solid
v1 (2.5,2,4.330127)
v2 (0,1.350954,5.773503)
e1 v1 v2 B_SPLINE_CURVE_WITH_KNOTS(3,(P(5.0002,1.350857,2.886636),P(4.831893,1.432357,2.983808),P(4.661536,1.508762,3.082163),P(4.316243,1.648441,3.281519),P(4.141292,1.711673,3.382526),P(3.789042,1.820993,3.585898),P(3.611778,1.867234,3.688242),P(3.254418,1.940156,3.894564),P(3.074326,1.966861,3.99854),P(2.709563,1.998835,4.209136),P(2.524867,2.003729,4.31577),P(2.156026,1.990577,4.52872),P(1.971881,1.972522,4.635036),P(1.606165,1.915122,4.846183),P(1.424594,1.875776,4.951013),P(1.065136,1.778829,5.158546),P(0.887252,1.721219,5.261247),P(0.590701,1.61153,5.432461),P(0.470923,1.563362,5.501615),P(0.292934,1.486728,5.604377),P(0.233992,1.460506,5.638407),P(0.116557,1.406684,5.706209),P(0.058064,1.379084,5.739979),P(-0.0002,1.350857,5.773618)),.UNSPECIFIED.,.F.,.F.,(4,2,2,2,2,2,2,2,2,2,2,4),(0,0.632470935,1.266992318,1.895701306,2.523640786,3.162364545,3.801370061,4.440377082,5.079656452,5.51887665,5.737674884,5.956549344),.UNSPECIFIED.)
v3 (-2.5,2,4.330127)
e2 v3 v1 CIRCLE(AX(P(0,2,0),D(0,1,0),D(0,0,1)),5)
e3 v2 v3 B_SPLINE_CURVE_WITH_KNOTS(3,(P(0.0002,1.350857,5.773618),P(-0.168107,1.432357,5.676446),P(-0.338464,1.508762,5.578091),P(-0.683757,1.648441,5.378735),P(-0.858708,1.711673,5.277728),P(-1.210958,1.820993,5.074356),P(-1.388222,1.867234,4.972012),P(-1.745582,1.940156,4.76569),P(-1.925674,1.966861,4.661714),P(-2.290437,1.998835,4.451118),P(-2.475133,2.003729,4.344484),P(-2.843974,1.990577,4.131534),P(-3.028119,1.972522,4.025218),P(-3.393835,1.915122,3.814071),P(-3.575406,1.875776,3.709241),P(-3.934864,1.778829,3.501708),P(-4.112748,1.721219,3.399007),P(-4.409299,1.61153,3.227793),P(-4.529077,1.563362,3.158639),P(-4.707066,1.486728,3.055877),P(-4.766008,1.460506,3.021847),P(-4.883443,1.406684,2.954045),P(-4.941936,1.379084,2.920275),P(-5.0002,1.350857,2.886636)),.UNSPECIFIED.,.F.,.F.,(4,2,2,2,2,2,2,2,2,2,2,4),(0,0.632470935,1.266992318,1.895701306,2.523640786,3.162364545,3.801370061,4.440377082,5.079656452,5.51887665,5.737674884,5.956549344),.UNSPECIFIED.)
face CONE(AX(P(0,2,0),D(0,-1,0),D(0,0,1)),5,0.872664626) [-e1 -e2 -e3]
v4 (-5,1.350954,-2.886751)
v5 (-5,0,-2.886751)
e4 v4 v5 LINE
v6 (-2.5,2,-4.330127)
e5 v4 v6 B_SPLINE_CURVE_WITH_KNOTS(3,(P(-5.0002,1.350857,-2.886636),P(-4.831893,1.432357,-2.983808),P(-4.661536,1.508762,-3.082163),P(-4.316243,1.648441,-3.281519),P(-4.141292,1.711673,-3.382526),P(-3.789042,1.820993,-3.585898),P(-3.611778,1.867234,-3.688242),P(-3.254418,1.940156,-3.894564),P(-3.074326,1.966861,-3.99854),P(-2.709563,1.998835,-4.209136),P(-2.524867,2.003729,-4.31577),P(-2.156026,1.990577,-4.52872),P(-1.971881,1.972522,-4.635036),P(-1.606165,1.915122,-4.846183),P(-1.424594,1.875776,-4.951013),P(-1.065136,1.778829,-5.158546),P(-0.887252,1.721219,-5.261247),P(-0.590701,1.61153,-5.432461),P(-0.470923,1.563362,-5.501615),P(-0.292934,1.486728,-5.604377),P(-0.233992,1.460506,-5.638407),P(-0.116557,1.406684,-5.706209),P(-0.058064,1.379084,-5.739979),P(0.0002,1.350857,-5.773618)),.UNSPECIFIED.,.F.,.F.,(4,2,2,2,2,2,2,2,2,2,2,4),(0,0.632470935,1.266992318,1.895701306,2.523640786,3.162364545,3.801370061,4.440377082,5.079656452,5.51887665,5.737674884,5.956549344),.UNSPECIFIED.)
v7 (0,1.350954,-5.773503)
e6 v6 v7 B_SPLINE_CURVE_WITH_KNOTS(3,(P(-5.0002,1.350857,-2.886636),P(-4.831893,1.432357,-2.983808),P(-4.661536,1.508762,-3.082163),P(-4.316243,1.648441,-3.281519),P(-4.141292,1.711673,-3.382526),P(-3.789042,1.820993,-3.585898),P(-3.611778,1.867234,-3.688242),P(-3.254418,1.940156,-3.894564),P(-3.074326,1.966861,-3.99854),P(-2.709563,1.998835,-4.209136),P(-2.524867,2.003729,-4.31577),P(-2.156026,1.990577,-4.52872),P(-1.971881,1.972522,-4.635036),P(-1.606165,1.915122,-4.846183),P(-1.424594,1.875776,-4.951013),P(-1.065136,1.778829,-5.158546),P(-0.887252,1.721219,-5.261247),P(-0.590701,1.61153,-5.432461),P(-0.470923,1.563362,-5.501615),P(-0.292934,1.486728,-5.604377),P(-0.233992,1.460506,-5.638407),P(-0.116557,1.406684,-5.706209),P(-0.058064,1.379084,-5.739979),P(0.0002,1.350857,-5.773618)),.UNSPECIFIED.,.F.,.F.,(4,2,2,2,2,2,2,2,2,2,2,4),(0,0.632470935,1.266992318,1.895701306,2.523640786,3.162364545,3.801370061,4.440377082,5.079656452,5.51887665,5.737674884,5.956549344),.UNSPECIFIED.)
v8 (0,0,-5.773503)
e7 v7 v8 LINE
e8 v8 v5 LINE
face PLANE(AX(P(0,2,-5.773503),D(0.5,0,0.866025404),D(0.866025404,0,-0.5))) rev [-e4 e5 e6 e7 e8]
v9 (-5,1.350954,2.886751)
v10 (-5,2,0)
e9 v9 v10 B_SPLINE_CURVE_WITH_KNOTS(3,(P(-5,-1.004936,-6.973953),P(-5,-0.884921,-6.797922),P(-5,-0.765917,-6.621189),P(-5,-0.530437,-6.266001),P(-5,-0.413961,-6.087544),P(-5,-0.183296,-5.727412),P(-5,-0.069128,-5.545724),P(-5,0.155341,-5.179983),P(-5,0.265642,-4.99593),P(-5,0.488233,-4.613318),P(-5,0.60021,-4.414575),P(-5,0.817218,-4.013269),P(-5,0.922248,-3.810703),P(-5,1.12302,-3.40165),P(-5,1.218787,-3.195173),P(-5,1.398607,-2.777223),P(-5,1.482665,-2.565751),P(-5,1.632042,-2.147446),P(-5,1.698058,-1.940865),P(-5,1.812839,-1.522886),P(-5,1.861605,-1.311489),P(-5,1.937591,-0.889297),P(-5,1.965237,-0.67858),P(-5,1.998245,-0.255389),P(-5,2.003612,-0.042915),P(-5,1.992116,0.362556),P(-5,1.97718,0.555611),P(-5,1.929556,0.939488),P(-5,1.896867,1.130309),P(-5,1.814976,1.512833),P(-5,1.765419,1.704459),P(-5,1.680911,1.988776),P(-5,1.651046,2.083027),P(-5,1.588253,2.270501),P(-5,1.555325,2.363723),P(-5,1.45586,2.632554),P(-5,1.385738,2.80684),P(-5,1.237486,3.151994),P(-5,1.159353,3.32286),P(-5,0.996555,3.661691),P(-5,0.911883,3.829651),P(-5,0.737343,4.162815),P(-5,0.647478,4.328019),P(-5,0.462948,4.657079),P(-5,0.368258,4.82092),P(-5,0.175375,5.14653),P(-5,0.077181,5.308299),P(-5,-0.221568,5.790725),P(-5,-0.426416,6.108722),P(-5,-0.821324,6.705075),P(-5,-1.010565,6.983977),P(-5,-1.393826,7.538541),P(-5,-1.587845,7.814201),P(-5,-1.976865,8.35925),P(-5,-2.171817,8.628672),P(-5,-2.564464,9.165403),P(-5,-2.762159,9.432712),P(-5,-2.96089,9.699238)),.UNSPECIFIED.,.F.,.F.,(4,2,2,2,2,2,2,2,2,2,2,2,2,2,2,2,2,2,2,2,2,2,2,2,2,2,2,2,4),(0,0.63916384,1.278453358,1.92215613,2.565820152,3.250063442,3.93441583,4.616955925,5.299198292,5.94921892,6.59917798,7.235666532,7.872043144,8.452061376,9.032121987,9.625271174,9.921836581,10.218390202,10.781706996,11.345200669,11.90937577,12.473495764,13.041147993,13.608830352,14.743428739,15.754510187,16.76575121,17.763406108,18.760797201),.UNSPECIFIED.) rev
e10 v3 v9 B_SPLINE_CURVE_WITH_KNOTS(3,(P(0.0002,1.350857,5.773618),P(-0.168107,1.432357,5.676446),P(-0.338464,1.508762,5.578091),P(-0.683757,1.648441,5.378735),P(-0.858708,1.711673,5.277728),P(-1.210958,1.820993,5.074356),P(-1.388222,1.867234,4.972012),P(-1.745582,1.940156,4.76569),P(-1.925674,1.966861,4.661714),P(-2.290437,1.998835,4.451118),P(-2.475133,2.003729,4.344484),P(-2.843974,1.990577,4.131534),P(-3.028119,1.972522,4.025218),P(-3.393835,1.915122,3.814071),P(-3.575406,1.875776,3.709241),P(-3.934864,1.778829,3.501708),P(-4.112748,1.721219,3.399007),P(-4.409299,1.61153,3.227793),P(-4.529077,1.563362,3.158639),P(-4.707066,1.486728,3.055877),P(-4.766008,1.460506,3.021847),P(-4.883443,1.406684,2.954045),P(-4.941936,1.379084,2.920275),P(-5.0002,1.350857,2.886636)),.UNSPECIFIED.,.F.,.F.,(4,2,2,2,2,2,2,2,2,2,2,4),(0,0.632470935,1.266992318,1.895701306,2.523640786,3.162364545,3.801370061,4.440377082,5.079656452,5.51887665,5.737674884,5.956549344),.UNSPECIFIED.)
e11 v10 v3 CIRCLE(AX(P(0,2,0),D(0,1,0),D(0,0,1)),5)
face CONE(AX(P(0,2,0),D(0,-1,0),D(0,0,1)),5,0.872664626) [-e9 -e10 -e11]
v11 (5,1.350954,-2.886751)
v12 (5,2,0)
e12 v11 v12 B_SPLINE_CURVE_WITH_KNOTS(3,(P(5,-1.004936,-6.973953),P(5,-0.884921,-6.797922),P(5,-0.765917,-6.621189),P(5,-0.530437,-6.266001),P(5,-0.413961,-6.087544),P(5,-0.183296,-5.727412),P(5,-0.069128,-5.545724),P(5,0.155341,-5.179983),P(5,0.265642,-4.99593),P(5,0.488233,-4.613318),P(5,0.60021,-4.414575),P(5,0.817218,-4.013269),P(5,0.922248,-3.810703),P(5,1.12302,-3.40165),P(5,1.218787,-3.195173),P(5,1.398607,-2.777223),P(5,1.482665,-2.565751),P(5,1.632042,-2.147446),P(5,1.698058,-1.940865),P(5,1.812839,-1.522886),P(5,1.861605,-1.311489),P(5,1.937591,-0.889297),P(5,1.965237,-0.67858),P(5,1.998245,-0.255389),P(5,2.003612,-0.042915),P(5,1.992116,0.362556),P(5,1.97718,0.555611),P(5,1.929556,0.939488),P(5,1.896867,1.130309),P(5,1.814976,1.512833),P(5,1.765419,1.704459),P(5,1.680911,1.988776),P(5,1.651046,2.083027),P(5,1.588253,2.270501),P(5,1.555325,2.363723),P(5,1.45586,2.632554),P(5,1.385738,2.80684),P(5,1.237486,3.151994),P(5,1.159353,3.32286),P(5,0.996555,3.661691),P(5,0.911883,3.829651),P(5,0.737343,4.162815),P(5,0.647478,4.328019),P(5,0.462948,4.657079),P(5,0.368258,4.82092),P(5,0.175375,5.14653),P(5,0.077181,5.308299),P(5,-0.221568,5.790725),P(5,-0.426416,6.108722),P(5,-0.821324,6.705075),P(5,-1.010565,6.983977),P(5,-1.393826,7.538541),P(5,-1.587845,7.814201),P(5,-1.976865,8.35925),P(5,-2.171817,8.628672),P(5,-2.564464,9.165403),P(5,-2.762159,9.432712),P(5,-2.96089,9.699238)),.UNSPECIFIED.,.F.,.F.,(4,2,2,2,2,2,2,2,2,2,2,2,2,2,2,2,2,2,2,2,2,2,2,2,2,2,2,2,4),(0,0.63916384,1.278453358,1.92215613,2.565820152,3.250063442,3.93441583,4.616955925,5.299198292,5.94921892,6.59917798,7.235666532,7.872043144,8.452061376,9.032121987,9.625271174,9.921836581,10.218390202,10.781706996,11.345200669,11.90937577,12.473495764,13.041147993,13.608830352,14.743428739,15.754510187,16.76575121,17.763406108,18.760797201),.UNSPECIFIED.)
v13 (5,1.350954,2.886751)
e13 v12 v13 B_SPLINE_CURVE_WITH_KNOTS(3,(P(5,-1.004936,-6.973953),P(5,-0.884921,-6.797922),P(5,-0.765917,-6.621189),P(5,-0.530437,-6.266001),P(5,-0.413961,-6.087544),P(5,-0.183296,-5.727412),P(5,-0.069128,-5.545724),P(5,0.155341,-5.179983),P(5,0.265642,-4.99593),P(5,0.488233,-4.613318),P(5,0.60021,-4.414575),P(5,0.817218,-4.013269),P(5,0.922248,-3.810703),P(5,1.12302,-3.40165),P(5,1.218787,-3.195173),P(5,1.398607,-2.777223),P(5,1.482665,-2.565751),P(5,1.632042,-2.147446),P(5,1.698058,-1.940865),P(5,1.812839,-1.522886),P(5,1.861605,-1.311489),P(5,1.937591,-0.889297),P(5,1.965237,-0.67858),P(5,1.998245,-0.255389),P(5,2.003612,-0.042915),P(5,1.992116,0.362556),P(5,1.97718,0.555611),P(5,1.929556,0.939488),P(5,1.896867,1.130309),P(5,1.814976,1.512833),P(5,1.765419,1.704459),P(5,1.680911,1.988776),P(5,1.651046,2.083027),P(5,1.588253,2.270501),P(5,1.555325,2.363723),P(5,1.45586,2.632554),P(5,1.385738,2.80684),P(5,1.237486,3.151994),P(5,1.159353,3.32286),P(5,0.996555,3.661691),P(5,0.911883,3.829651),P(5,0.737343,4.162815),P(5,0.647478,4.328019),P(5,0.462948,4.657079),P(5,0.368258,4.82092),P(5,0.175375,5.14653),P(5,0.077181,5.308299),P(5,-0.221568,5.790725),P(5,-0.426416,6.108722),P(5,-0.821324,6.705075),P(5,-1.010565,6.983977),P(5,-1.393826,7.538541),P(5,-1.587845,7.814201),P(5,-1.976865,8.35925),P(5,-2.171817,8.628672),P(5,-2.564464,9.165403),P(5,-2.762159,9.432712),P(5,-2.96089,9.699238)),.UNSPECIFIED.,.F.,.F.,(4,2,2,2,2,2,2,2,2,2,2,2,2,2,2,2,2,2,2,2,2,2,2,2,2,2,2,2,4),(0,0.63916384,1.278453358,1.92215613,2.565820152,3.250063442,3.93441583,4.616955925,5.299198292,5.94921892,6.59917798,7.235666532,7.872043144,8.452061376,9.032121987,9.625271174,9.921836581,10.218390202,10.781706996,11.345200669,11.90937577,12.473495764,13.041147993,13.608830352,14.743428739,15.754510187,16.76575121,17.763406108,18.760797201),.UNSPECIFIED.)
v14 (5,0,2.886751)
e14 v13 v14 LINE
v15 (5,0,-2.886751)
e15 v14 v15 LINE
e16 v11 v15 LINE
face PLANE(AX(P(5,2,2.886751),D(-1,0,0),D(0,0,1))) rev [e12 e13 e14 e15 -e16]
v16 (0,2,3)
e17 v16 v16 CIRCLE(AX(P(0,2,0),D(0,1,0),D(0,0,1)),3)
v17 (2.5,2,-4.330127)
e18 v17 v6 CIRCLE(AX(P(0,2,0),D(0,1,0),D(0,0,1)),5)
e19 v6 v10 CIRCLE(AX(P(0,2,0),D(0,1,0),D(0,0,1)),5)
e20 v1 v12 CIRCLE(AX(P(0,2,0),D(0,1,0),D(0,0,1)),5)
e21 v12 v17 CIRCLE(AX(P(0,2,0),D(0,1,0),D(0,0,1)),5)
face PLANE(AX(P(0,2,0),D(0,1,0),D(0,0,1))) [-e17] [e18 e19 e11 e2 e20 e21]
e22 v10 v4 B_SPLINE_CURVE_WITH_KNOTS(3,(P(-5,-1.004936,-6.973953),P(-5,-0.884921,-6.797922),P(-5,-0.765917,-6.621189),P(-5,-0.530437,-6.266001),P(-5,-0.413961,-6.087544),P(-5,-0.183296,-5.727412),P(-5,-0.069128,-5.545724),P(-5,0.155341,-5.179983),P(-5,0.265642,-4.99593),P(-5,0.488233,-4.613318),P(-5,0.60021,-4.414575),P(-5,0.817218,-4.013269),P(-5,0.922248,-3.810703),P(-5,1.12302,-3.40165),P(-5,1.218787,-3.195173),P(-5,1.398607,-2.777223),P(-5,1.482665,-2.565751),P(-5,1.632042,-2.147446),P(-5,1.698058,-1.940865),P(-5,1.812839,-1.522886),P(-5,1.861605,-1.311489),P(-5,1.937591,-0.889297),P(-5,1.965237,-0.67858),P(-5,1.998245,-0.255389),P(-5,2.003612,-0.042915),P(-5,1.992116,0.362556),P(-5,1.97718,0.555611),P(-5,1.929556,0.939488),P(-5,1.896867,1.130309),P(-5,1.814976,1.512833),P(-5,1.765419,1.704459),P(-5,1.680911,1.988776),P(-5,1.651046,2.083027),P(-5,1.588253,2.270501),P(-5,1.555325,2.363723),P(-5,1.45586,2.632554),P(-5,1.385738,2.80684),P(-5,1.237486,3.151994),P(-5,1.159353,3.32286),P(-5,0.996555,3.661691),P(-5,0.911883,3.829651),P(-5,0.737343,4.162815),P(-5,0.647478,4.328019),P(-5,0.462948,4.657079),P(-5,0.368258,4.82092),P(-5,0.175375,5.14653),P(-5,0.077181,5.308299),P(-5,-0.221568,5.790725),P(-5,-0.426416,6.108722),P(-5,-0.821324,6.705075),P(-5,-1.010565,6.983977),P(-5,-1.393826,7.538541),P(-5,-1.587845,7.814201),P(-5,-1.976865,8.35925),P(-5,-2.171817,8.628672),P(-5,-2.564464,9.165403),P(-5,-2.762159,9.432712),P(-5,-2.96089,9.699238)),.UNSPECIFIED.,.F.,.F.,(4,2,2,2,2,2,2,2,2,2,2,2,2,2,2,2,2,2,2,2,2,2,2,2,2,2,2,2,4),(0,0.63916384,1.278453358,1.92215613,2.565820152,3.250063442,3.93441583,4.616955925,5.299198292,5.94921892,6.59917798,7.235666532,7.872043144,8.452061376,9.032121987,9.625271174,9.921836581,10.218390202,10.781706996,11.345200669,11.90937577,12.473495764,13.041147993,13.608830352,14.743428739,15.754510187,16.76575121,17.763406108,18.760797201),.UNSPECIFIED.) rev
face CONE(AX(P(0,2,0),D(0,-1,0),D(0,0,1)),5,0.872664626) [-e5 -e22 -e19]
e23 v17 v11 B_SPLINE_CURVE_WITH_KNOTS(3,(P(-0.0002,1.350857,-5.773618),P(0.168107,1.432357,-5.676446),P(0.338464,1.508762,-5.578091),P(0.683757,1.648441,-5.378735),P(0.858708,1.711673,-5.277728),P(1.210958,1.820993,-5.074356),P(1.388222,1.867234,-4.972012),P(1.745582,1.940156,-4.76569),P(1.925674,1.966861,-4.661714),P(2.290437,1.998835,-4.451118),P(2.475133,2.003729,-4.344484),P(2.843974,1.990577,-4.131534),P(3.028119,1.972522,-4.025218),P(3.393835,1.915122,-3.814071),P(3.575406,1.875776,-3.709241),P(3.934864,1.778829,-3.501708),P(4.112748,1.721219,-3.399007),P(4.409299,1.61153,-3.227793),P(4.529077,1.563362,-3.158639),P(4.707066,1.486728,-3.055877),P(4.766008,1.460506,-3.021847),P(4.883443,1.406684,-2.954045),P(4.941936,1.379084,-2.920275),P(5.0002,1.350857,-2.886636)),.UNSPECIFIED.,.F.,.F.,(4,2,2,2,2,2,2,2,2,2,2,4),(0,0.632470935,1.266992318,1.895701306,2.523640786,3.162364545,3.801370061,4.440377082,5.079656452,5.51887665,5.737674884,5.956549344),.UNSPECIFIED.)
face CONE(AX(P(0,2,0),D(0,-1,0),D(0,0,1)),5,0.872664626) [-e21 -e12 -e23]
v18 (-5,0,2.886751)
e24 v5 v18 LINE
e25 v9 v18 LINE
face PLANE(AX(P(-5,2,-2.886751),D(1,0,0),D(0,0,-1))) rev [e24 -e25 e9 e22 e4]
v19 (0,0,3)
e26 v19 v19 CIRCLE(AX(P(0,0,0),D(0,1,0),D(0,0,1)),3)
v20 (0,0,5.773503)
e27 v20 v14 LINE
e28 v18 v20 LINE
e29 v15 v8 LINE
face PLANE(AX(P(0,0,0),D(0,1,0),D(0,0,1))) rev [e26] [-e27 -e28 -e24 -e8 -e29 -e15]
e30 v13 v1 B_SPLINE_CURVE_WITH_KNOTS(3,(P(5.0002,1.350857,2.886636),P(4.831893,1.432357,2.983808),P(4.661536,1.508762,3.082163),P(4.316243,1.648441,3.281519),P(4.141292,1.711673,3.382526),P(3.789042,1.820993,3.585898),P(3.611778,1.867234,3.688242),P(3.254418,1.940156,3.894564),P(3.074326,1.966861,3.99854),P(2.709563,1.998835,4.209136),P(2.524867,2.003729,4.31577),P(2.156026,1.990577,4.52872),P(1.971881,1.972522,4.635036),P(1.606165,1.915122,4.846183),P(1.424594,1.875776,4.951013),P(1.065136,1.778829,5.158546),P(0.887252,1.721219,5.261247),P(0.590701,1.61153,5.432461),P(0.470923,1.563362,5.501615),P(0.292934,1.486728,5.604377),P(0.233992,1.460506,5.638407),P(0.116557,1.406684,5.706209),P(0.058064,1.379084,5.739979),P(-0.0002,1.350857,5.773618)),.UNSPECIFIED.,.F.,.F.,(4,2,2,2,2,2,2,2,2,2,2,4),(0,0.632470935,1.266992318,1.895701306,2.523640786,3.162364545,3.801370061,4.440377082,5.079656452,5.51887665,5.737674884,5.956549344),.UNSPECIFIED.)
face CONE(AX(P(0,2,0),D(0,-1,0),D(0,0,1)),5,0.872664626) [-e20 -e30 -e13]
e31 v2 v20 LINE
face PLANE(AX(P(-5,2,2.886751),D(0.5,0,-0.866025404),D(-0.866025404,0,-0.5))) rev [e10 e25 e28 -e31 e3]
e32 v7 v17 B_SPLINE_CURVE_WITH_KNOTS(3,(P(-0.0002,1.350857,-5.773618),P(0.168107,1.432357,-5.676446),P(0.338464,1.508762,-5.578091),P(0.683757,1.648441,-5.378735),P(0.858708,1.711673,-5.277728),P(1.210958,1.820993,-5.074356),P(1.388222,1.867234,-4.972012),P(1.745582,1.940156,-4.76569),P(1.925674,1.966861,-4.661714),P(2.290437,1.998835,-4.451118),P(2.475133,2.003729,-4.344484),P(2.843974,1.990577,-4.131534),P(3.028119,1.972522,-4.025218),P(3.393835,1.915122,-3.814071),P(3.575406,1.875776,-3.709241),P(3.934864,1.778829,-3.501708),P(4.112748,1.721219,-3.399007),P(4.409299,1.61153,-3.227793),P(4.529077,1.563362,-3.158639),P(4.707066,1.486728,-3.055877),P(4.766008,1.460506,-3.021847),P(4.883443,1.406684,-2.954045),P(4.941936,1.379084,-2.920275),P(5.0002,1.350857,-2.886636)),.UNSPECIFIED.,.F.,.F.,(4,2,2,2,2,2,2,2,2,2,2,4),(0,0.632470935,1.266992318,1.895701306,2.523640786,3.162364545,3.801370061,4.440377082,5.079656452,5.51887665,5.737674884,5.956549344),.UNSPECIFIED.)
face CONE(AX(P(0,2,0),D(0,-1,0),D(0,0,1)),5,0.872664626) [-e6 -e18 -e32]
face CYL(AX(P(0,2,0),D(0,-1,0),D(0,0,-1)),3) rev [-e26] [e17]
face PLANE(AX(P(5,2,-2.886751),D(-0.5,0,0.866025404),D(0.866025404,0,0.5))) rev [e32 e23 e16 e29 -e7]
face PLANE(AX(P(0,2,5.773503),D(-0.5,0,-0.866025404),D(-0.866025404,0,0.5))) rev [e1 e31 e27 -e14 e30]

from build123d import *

# Parameters (mm, degrees)
SKETCH1_R           = 3
BOSS_EXTRUDE1_DEPTH = 2


# Read off the part's stored shape, not the designer's step: Cut-Extrude2
with BuildPart() as part:
    # Sketch1 → Boss-Extrude1 (new body)
    with BuildSketch(Plane(origin=(0, 0, 0), x_dir=(1, 0, 0), z_dir=(0, 1, 0))):
        Polygon((0, -5.773502692), (5, -2.886751346), (5, 2.886751346), (0, 5.773502692), (-5, 2.886751346), (-5, -2.886751346), align=None)
        with Locations(Location((0, 0, 0), (0, 0, 270))):
            Circle(SKETCH1_R, mode=Mode.SUBTRACT)
    extrude(amount=BOSS_EXTRUDE1_DEPTH)

    # Cut-Extrude2 outline → Cut-Extrude2 (revolve, cut)
    with BuildSketch(Plane.XY):
        Polygon((5.773502708, 2), (5, 2), (5.773502708, 1.350954163), align=None)
    revolve(axis=Axis((0, 0, 0), (0, 1, 0)), mode=Mode.SUBTRACT)


solid = part.part
